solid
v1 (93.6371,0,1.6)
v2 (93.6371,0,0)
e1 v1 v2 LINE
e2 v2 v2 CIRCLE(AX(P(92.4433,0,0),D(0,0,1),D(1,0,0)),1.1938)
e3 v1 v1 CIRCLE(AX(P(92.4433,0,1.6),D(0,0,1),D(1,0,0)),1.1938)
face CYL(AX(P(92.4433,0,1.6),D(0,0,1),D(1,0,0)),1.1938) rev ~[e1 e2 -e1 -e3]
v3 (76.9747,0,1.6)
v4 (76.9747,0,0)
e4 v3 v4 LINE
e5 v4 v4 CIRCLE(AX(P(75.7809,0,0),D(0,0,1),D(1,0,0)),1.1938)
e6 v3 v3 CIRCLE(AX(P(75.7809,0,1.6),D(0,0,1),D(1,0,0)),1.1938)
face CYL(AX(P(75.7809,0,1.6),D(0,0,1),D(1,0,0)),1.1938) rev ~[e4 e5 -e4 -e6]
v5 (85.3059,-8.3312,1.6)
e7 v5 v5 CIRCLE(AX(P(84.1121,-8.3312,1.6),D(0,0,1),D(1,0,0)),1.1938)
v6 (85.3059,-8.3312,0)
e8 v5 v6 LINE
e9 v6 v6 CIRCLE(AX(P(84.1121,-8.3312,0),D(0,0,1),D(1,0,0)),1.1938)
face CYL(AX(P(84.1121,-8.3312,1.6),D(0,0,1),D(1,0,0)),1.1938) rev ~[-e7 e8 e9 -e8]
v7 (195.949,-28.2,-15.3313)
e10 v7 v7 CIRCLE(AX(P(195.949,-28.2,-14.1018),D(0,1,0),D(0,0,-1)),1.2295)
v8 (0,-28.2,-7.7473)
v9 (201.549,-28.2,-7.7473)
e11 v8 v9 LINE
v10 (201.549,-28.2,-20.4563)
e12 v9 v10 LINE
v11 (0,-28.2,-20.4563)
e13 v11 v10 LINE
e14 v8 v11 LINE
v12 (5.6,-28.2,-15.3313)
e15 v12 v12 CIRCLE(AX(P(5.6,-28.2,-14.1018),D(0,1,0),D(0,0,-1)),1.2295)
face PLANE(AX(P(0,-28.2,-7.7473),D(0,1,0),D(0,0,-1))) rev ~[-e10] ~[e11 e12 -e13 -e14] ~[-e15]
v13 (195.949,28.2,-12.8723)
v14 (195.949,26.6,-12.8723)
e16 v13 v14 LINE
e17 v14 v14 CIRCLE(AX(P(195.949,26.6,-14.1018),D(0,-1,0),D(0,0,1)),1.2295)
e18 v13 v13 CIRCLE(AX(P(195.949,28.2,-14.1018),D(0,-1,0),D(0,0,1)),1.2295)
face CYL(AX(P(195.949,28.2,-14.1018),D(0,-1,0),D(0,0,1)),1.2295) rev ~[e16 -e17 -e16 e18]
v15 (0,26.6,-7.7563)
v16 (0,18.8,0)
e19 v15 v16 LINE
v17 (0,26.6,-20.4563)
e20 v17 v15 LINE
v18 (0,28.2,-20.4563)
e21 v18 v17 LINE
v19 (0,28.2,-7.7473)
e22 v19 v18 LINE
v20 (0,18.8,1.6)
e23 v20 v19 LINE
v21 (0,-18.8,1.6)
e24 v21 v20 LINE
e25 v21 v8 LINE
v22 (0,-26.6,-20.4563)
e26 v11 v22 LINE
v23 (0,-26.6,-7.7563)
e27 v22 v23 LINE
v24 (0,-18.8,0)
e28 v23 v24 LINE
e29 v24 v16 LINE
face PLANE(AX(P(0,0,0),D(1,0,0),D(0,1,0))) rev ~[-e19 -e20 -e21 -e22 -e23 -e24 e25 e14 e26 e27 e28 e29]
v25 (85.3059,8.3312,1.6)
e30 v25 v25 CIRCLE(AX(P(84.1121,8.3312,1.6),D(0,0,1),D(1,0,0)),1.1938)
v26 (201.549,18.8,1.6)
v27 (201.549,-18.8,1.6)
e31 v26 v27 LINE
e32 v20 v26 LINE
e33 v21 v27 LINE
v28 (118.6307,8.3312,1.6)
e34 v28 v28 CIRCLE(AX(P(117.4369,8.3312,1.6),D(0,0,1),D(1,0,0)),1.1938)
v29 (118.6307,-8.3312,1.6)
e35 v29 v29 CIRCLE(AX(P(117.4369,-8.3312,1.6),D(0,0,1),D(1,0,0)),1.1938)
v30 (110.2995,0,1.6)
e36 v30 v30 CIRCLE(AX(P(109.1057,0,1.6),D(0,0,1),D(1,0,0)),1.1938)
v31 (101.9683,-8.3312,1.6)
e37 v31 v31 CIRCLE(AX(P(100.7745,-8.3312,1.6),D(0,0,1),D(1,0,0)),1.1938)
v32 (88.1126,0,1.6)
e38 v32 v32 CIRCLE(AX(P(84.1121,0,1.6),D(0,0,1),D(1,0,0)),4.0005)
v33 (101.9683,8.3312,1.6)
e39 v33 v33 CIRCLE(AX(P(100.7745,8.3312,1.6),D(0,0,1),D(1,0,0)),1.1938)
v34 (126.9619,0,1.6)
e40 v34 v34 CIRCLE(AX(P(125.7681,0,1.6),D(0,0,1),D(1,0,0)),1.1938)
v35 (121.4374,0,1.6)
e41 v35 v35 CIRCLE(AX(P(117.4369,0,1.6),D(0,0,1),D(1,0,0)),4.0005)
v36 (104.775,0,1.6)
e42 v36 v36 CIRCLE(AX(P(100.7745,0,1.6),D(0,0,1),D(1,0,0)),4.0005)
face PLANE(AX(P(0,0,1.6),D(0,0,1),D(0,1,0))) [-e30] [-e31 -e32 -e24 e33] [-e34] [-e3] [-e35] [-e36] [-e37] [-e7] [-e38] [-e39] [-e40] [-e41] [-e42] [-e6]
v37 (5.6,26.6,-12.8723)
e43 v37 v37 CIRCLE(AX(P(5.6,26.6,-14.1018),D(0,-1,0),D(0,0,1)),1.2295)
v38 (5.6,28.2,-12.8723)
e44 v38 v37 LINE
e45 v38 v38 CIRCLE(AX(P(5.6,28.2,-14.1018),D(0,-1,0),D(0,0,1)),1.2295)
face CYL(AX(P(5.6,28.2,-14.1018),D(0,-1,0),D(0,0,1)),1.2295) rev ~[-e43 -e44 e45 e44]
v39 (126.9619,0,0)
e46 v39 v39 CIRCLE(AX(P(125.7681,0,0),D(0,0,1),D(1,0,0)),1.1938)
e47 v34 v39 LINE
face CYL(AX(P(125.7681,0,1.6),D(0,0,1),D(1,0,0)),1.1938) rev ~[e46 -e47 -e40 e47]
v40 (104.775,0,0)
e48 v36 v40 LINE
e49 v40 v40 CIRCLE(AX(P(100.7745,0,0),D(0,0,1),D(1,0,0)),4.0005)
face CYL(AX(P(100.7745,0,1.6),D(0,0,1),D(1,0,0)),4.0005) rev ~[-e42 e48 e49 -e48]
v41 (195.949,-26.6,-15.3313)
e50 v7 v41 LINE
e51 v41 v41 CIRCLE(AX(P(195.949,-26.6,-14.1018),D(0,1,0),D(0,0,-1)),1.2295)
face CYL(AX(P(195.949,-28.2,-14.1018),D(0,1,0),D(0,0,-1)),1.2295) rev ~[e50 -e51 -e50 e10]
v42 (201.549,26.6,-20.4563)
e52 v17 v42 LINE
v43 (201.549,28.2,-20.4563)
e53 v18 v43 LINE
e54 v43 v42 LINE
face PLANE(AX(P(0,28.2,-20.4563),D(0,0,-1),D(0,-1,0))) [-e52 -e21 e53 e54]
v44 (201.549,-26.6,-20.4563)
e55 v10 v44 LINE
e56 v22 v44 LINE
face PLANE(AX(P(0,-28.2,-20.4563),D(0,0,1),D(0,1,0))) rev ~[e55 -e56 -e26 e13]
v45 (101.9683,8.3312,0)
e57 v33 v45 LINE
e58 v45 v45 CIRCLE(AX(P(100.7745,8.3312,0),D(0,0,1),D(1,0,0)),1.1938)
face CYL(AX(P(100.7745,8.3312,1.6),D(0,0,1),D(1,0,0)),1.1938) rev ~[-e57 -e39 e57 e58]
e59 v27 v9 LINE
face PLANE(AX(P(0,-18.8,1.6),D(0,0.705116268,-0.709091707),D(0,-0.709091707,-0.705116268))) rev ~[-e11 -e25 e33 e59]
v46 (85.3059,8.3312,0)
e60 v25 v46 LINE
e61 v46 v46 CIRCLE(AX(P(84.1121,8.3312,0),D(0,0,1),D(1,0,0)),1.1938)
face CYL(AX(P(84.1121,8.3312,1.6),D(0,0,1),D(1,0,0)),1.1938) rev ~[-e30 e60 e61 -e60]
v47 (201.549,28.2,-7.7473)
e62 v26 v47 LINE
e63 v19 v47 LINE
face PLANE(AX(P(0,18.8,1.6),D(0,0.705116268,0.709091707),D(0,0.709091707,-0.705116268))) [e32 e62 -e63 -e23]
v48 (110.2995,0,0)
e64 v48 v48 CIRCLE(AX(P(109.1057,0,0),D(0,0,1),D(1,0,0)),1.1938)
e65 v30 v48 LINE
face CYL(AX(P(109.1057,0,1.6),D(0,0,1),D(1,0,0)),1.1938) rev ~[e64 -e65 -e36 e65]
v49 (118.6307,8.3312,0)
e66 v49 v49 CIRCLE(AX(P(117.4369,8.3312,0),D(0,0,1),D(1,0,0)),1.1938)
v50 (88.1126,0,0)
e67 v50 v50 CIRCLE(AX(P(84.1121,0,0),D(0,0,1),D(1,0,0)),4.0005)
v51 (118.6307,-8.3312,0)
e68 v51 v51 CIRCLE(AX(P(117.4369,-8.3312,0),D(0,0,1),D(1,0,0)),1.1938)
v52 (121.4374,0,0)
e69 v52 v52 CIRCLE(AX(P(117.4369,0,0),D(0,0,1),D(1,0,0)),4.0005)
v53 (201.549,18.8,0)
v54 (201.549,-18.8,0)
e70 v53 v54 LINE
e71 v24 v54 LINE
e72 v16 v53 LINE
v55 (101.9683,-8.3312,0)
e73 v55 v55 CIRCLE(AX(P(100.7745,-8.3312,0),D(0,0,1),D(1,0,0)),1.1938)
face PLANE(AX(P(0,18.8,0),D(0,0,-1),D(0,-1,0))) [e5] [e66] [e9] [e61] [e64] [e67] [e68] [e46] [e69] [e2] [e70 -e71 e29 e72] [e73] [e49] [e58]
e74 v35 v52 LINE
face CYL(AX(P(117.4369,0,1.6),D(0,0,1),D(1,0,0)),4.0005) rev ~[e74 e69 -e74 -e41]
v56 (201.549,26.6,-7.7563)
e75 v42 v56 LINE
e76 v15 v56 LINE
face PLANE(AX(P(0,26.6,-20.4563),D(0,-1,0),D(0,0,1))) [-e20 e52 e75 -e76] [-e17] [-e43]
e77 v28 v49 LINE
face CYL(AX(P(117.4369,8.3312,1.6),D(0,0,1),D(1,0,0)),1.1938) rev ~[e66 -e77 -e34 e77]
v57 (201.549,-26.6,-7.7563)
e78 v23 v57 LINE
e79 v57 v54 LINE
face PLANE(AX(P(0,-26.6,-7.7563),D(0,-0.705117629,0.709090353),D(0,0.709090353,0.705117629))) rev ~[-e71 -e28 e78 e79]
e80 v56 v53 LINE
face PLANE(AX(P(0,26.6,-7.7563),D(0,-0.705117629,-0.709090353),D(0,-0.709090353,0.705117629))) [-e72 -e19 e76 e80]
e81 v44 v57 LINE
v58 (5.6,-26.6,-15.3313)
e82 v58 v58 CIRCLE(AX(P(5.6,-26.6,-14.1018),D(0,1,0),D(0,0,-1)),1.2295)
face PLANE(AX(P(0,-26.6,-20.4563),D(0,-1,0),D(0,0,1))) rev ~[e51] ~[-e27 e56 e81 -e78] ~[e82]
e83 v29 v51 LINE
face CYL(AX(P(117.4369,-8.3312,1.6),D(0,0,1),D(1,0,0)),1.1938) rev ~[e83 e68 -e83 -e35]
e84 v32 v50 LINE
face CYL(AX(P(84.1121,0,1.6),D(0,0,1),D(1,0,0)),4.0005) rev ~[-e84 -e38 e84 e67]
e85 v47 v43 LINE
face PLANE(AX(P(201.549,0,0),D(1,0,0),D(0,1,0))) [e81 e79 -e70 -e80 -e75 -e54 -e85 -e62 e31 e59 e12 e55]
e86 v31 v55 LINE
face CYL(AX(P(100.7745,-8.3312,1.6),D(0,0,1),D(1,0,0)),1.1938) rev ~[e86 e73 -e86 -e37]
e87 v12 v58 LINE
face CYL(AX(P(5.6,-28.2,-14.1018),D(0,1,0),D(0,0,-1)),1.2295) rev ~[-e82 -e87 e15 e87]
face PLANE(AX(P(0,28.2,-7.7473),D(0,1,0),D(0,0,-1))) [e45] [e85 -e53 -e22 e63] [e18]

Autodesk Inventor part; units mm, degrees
ref_plane "YZ Plane" through (0, 0, 0) normal (1, 0, 0) x (0, 1, 0)
ref_plane "XZ Plane" through (0, 0, 0) normal (0, 1, 0) x (-1, 0, 0)
ref_plane "XY Plane" through (0, 0, 0) normal (0, 0, 1) x (1, 0, 0)
sketch "Sketch1" plane through (0, 0, 0) normal (1, 0, 0) x (0, 1, 0)
  line L0 (18.8, 0) -> (-18.8, 0)
  line L1 (-18.8, 0) -> (-18.8, 1.6)
  line L2 (-18.8, 1.6) -> (18.8, 1.6)
  line L3 (18.8, 1.6) -> (18.8, 0)
  line L4 (18.8, 1.6) -> (28.2, -7.7473)
  line L5 (28.2, -7.7473) -> (28.2, -20.4563)
  line L6 (28.2, -20.4563) -> (26.6, -20.4563)
  line L7 (26.6, -20.4563) -> (26.6, -7.7563)
  line L8 (26.6, -7.7563) -> (18.8, 0)
  line L9 (0, 0) -> (0, 1.6)
  line L10 (-18.8, 1.6) -> (-28.2, -7.7473)
  line L11 (-28.2, -7.7473) -> (-28.2, -20.4563)
  line L12 (-26.6, -20.4563) -> (-26.6, -7.7563)
  line L13 (-26.6, -7.7563) -> (-18.8, 0)
  line L14 (-28.2, -20.4563) -> (-26.6, -20.4563)
  dimension "d0" = 1.6
  dimension "d1" = 1.6
  dimension "d3" = 11
  dimension "d4" = 12.7
  dimension "d5" = 56.4
  dimension "d8" = 7.8
extrude "Extrusion1" add sketch "Sketch1" along normal blind 201.549
sketch "Sketch2" plane through (0, 28.2, -7.7473) normal (0, 1, 0) x (1, 0, 0)
  line L0 (0, 12.709) -> (0, 0) projected
  line L1 (0, 0) -> (201.549, 0) projected
  line L2 (201.549, 12.709) -> (201.549, 0) projected
  line L3 (0, 12.709) -> (201.549, 12.709) projected
  point P0 (0, -7.7473)
  point P1 (5.6, 6.3545)
  point P2 (195.949, 6.3545)
  point P3 (0, 6.3545)
  point P4 (201.549, 6.3545)
  dimension "d11" = 5.6
  dimension "d12" = 5.6
hole "Hole1" at (5.6, 28.2, -14.1018) at (195.949, 28.2, -14.1018) direction (0, -1, 0) diameter 2.459 end up to surface
sketch "Sketch3" plane through (0, -28.2, -20.4563) normal (0, -1, 0) x (1, 0, 0)
  circle A0 centre (195.949, 6.3545) radius 1.2295 projected
  circle A1 centre (5.6, 6.3545) radius 1.2295 projected
  point P0 (0, 20.4563)
hole "Hole2" at (195.949, -28.2, -14.1018) at (5.6, -28.2, -14.1018) direction (0, 1, 0) diameter 2.459 end up to surface
sketch "Sketch4" plane through (0, -18.8, 1.6) normal (0, 0, 1) x (1, 0, 0)
  line L0 (0, 37.6) -> (0, 0) projected
  line L1 (0, 0) -> (201.549, 0) projected
  line L2 (201.549, 37.6) -> (201.549, 0) projected
  line L3 (0, 37.6) -> (201.549, 37.6) construction
  circle A0 centre (100.7745, 18.8) radius 4.0005
  circle A1 centre (100.7745, 27.1312) radius 1.1938
  circle A2 centre (92.4433, 18.8) radius 1.1938
  circle A3 centre (100.7745, 10.4688) radius 1.1938
  circle A4 centre (109.1057, 18.8) radius 1.1938
  line L4 (0, 37.6) -> (201.549, 37.6) projected
  circle A5 centre (84.1121, 18.8) radius 4.0005
  circle A6 centre (84.1121, 27.1312) radius 1.1938
  circle A7 centre (75.7809, 18.8) radius 1.1938
  circle A8 centre (84.1121, 10.4688) radius 1.1938
  circle A9 centre (92.4433, 18.8) radius 1.1938
  circle A10 centre (117.4369, 18.8) radius 4.0005
  circle A11 centre (117.4369, 27.1312) radius 1.1938
  circle A12 centre (109.1057, 18.8) radius 1.1938
  circle A13 centre (117.4369, 10.4688) radius 1.1938
  circle A14 centre (125.7681, 18.8) radius 1.1938
  point P0 (0, 18.8)
  point P1 (100.7745, 37.6)
  point P2 (201.549, 18.8)
  point P3 (100.7745, 37.6)
  dimension "d27" = 8.001
  dimension "d28" = 8.3312
  dimension "d29" = 2.3876
  dimension "d32" = 360
  dimension "d39" = 8.001
  dimension "d40" = 8.3312
  dimension "d41" = 2.3876
  dimension "d42" = 360
  dimension "d47" = 8.001
  dimension "d48" = 8.3312
  dimension "d49" = 2.3876
  dimension "d50" = 360
  dimension "d53" = 16.6624
  dimension "d54" = 16.6624
extrude "Extrusion2" cut sketch "Sketch4" against normal through all contours A0 | A1 | A2 | A3 | A4 | A5 | A6 | A7 | A8 | A10 | A11 | A13 | A14
equation "\"d12\" = d11"
equation "\"d54\" = d53"
properties part number "ChassisMainBracket"
